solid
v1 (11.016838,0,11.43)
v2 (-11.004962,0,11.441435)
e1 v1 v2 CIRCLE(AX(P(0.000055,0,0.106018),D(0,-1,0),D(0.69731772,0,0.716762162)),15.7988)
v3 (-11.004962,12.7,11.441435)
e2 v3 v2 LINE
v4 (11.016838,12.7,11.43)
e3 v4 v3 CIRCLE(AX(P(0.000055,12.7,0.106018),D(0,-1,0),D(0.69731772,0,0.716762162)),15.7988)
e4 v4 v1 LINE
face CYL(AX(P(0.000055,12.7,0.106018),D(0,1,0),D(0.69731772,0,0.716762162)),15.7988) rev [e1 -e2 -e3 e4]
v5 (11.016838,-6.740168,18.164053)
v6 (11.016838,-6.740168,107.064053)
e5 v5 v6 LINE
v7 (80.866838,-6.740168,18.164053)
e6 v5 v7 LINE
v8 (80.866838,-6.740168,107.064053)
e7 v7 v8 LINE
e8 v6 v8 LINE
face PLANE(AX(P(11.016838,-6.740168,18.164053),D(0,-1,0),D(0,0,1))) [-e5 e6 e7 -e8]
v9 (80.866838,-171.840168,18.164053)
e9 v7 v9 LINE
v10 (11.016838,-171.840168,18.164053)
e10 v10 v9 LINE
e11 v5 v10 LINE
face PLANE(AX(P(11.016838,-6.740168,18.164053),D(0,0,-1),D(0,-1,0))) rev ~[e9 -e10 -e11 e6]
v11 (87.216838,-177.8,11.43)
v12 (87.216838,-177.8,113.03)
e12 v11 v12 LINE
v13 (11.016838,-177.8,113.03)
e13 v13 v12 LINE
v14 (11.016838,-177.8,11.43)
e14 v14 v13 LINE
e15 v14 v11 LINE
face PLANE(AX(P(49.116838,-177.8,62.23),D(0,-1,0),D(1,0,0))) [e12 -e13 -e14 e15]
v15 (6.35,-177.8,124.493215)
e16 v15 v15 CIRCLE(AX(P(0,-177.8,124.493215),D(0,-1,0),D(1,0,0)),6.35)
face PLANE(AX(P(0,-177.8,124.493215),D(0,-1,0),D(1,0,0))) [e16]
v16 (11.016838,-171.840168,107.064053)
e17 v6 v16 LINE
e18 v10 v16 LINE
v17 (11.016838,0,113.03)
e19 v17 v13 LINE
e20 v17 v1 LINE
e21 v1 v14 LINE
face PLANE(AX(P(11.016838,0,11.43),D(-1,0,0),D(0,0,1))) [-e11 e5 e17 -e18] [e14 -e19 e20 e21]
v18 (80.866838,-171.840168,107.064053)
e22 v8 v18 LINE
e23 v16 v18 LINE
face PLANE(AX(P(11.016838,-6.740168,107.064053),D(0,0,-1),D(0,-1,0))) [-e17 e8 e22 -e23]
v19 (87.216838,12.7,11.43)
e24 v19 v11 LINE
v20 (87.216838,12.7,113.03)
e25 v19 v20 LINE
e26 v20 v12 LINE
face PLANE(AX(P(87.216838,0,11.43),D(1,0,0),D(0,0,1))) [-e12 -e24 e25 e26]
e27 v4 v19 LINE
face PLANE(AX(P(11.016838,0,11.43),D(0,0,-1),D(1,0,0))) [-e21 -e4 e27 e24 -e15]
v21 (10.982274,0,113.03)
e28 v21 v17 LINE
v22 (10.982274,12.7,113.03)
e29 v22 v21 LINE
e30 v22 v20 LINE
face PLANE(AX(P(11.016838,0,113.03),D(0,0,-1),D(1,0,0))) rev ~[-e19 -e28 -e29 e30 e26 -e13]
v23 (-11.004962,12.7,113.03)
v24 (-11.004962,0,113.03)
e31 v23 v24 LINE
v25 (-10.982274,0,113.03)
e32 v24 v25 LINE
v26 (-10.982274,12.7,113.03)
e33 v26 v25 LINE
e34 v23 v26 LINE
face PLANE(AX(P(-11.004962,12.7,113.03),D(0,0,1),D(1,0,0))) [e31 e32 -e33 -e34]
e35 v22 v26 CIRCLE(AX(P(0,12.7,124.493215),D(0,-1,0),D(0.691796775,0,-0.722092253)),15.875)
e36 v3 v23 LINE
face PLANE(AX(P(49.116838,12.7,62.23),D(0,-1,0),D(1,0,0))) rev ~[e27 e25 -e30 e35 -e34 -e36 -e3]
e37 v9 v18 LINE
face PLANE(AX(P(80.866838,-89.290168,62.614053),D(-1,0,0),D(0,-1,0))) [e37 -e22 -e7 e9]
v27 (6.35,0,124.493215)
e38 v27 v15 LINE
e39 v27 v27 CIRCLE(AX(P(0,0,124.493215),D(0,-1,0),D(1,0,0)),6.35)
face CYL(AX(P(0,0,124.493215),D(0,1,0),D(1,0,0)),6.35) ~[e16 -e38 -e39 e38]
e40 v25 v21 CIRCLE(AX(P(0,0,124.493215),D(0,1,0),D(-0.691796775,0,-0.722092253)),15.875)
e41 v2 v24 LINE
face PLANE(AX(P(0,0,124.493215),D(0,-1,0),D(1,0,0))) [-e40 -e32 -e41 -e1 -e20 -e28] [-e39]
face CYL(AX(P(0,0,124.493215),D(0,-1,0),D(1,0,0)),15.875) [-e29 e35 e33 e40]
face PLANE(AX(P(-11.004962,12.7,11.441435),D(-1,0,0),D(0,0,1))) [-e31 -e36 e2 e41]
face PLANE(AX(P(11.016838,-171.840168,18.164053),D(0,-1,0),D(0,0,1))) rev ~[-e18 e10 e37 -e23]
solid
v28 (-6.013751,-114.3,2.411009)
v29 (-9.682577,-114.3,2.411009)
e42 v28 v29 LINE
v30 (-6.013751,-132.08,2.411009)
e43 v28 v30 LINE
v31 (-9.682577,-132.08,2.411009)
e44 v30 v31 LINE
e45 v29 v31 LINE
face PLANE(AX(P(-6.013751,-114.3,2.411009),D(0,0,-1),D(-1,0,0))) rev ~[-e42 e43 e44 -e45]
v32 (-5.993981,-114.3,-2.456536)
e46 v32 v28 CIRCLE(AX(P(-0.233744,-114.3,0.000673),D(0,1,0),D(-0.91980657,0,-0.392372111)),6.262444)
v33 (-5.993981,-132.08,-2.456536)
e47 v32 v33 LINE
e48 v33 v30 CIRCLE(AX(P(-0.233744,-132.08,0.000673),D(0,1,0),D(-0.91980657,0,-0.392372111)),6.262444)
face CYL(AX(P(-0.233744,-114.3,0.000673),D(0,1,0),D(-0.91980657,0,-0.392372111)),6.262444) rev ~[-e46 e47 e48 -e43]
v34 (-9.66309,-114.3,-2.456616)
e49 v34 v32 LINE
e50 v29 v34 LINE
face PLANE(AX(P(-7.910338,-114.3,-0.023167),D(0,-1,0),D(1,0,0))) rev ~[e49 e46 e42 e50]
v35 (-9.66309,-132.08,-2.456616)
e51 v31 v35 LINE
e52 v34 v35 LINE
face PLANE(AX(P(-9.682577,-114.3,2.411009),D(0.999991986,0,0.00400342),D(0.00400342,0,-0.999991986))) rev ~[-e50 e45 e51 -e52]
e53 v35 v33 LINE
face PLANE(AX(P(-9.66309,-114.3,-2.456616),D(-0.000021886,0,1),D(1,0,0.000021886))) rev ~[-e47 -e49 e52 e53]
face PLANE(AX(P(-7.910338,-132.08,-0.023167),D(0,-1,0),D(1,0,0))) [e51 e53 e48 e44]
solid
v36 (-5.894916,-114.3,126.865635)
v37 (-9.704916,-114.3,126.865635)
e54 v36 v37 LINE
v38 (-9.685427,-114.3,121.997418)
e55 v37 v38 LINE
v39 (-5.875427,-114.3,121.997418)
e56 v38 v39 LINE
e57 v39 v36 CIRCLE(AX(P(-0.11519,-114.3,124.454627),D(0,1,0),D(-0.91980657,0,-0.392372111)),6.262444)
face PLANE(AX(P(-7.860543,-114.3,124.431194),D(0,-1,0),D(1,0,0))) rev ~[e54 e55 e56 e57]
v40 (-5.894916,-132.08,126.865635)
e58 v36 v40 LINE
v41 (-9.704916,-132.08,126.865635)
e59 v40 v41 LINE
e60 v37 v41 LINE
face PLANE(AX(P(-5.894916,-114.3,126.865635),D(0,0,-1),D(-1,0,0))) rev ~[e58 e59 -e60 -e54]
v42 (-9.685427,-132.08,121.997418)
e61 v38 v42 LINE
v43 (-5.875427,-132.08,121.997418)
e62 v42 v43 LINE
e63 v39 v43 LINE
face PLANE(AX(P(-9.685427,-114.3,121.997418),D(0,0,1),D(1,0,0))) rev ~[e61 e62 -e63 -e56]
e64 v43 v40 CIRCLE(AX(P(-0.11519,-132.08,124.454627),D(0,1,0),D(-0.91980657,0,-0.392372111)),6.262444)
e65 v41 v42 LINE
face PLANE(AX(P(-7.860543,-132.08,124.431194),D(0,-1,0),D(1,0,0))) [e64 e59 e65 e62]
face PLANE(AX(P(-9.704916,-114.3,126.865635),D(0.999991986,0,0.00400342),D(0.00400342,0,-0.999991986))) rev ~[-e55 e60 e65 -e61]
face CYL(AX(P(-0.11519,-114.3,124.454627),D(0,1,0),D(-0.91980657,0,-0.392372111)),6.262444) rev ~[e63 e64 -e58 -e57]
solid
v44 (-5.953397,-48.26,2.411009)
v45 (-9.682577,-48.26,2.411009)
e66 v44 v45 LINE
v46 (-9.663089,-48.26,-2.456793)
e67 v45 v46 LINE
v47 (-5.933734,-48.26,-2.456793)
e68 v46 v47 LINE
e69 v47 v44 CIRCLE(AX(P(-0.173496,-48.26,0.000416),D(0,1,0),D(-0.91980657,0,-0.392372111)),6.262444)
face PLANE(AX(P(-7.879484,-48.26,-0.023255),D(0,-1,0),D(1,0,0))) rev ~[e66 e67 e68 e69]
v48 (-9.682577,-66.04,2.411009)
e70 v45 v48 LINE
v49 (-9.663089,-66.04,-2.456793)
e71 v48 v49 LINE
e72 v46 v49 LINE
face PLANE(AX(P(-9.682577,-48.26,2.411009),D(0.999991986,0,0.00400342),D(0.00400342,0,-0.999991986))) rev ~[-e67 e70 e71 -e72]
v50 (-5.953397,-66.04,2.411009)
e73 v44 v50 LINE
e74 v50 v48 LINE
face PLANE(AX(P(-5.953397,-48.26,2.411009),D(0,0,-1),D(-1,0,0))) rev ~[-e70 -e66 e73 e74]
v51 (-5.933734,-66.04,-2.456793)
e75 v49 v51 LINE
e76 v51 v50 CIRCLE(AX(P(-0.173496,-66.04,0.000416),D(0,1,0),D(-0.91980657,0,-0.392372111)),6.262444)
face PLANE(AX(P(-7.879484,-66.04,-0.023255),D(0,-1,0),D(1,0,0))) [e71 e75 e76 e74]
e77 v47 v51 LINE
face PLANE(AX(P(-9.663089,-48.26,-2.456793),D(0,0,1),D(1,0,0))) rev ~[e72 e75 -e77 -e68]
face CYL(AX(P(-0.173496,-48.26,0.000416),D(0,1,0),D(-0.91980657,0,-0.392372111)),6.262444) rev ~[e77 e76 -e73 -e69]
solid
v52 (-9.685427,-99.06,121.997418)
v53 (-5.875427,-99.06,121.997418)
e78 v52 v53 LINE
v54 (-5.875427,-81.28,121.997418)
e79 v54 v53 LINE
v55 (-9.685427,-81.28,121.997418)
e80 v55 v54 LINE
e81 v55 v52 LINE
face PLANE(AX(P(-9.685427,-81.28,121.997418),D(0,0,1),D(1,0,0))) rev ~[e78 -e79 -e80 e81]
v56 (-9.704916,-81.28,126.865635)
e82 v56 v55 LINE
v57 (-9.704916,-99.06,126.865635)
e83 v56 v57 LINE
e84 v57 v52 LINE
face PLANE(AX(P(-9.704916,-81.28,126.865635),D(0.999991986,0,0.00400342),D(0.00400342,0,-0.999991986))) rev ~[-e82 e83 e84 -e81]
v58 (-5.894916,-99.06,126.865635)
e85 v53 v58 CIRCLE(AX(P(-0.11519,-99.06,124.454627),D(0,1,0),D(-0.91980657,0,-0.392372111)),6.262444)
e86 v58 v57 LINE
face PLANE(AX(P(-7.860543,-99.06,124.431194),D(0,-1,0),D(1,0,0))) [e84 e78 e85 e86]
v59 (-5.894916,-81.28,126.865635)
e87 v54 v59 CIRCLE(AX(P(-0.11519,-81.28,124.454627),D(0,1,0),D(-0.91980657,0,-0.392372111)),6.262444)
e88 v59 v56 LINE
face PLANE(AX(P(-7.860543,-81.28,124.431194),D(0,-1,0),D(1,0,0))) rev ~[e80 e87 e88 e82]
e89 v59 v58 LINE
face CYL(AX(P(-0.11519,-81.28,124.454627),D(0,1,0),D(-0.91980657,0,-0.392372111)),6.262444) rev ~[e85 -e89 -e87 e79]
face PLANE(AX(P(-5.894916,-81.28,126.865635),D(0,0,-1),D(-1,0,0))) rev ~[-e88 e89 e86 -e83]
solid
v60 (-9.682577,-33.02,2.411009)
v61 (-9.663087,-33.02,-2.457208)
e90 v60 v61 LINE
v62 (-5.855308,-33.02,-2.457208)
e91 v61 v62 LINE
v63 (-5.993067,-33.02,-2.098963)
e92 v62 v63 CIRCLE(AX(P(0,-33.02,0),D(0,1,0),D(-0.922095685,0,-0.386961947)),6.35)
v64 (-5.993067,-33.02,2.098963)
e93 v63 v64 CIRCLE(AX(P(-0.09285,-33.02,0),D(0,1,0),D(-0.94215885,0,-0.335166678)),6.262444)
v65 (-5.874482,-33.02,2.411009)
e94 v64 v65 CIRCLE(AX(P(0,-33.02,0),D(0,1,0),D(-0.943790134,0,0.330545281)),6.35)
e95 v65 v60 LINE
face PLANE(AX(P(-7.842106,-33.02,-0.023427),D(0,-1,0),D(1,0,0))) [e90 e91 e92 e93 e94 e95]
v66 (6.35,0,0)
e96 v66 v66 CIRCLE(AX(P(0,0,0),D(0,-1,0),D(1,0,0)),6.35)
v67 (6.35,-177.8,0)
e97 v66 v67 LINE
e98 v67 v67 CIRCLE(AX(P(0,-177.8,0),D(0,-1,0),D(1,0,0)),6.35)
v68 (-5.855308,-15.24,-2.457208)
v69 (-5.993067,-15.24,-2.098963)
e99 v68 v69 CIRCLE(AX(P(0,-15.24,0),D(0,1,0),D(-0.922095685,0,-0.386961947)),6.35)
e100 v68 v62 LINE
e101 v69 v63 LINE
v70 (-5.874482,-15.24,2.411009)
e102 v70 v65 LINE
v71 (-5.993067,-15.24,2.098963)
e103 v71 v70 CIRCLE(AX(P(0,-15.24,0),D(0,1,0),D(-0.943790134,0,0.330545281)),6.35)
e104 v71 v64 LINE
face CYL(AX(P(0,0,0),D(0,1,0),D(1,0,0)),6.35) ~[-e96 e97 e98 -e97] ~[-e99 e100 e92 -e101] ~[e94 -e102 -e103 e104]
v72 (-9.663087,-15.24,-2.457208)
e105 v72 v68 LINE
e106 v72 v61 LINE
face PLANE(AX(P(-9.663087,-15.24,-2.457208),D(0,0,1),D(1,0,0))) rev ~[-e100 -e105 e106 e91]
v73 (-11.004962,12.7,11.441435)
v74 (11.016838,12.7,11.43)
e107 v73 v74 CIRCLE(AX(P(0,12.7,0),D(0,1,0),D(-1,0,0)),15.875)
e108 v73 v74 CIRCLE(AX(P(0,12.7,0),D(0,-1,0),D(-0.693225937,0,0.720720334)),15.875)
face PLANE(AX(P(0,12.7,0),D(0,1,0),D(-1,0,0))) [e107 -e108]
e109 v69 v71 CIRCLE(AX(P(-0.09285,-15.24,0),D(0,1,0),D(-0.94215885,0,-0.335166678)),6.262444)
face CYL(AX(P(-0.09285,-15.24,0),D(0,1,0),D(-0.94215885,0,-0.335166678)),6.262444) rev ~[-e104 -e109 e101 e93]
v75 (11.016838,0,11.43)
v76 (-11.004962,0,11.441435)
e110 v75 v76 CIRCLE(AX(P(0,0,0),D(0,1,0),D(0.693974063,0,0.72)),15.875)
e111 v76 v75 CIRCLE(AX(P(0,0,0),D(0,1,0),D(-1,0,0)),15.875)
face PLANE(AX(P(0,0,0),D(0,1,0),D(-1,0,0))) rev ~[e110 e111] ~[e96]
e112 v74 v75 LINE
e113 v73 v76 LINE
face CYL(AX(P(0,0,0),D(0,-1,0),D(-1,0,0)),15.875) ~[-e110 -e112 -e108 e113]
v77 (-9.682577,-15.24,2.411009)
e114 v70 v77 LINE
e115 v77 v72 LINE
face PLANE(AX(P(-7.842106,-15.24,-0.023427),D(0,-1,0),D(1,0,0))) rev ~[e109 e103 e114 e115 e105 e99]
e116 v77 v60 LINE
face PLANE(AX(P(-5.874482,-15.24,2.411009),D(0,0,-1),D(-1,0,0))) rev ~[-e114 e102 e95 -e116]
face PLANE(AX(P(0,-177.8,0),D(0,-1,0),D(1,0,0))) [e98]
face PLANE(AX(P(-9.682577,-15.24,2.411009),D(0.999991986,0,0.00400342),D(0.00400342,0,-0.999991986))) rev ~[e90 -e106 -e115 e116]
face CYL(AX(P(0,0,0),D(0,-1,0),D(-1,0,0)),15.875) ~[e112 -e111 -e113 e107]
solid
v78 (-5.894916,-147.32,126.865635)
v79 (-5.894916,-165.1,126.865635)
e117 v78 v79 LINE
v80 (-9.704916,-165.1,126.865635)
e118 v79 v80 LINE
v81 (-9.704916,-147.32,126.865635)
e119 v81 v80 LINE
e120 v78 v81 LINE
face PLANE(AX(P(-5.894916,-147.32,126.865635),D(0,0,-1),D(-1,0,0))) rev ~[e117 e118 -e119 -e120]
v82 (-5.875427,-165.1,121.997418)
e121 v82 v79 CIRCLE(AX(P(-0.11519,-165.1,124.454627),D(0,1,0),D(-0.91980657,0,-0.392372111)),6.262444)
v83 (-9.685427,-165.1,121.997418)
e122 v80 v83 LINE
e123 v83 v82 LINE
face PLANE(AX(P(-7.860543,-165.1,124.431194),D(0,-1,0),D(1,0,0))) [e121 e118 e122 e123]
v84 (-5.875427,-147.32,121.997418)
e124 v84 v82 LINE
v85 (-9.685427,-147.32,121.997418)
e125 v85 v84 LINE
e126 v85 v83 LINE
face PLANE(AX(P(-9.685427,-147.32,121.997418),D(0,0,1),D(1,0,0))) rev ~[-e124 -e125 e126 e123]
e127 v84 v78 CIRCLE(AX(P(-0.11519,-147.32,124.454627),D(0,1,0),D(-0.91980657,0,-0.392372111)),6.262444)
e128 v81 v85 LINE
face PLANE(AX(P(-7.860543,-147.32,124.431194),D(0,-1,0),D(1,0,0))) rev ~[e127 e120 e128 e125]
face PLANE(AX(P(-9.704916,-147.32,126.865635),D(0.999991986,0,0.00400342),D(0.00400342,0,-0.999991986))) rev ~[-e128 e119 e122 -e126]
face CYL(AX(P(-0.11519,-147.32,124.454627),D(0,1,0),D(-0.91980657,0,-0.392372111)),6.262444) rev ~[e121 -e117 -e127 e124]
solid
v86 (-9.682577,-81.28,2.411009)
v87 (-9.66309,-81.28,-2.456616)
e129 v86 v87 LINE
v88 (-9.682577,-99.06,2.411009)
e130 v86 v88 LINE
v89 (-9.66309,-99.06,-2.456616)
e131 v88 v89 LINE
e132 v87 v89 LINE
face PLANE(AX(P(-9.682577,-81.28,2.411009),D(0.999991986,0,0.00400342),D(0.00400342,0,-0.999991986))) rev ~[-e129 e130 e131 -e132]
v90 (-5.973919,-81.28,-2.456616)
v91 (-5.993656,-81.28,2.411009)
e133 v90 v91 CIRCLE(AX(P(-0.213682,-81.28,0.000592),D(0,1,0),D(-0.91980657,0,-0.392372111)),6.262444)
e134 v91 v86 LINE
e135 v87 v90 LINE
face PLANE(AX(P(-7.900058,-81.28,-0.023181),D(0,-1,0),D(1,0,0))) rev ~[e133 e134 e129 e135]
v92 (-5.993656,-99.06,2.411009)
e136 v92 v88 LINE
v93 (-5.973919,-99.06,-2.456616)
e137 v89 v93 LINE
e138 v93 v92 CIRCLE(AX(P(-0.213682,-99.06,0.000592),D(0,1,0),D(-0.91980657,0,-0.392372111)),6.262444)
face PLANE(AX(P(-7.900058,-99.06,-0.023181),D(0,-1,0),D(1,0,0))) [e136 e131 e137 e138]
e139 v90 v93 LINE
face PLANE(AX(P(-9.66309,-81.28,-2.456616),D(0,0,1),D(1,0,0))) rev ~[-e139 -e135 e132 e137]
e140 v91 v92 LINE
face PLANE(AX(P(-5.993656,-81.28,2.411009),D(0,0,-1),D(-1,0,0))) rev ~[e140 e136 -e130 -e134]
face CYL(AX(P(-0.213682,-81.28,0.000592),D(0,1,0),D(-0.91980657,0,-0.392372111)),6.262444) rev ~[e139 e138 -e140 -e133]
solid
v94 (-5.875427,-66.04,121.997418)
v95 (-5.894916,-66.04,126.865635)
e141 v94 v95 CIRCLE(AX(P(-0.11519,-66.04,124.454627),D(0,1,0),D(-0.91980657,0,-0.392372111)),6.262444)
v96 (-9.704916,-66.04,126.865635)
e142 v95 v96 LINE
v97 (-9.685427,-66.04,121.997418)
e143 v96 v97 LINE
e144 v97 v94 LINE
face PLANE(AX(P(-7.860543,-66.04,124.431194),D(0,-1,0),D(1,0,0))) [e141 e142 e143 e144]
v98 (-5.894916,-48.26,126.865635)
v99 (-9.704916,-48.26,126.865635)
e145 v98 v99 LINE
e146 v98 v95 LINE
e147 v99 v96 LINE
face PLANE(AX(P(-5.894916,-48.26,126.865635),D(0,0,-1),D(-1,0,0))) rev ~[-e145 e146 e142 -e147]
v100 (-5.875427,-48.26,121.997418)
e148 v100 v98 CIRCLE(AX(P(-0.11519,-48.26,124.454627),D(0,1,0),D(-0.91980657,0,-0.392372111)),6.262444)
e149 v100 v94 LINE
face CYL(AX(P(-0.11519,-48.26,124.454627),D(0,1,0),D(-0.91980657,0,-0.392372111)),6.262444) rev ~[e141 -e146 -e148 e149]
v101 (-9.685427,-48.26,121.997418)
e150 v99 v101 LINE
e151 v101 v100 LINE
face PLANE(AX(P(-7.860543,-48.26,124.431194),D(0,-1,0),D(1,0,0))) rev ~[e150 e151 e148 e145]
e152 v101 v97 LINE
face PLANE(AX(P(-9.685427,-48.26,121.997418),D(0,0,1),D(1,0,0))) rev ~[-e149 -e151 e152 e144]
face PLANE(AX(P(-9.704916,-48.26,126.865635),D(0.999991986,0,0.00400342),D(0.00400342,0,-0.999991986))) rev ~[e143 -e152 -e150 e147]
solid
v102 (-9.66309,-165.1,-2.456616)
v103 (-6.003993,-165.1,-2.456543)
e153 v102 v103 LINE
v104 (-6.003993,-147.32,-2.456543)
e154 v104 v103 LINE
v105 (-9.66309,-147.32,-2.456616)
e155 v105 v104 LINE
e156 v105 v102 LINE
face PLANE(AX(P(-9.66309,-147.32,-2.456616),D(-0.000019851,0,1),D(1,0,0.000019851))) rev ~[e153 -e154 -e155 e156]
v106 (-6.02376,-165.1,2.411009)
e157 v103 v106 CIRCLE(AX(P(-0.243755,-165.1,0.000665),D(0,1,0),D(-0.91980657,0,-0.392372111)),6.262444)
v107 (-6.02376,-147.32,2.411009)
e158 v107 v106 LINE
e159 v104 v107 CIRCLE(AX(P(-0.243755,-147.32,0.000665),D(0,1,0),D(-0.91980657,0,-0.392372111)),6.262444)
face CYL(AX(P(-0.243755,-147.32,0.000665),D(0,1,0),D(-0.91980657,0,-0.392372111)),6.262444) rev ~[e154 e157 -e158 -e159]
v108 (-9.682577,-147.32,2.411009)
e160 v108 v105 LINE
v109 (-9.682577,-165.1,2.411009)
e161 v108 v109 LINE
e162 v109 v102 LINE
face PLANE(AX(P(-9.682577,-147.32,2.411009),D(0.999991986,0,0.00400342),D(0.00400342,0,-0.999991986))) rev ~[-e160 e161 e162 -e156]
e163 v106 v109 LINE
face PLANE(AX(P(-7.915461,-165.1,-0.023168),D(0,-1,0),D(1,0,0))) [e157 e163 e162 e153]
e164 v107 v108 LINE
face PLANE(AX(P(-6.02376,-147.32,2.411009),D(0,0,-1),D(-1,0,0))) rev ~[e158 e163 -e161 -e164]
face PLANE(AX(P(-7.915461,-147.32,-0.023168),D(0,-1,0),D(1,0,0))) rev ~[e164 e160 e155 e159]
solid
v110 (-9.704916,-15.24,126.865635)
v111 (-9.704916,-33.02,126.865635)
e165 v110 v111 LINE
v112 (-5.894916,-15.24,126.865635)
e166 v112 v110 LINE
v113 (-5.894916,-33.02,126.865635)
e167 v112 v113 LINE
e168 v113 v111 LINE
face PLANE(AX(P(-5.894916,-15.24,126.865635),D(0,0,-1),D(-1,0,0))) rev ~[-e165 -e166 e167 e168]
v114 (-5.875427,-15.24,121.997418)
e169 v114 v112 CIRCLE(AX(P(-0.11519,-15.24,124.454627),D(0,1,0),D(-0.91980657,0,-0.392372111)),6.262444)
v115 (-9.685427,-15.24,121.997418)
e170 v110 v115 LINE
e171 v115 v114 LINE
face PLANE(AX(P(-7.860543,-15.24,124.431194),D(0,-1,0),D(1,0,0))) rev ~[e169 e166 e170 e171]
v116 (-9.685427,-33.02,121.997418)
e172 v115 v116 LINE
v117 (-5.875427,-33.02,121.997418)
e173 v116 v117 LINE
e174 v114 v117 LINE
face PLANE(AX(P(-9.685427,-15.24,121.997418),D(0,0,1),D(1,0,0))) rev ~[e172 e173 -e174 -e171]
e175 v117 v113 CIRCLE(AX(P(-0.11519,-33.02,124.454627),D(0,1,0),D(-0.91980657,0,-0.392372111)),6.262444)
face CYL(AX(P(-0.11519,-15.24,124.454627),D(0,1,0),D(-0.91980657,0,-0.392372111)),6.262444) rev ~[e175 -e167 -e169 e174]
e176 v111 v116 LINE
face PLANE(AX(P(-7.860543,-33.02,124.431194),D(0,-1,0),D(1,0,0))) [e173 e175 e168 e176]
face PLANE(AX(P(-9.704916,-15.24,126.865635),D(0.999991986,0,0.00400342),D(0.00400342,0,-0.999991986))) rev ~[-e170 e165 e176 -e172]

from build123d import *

# Parameters (mm, degrees)
F0_R           = 6.35
F1_DEPTH       = 177.8
F2_R           = 15.875
F2_R_2         = 6.35
F3_DEPTH       = 12.7
F6_DEPTH       = 12.7
F5_R           = 15.875
F7_DEPTH       = 12.7
F8_R           = 6.35
F9_DEPTH       = 177.8
F10_W          = 76.2
F10_H          = 101.6
F11_DEPTH      = 177.8
F11_DEPTH_BACK = 12.7
F12_W          = 165.1
F12_H          = 88.9
F13_DEPTH      = 69.85
F15_START      = 15.24
F15_DEPTH      = 17.78
F17_START      = 15.24
F17_DEPTH      = 17.78
F19_START      = 15.24
F19_DEPTH      = 17.78
F21_START      = 15.24
F21_DEPTH      = 17.78
F23_START      = 15.24
F23_DEPTH      = 17.78
F25_START      = 15.24
F25_DEPTH      = 17.78
F26_START      = 15.24
F26_DEPTH      = 17.78
F27_START      = 15.24
F27_DEPTH      = 17.78
F28_START      = 15.24
F28_DEPTH      = 17.78
F29_START      = 15.24
F29_DEPTH      = 17.78


# Not quite as in the source:
# - ends of sketch curves that miss each other by under 0.0002 mm in the source are joined


with BuildPart() as f1:
    # F0 (on Front) → F1 (new body)
    with BuildSketch(Plane.XZ):
        Circle(F0_R)
    extrude(amount=F1_DEPTH)

    # F2 (on face) → F3 (join)
    with BuildSketch(Plane(origin=(0, 0, 0), x_dir=(-1, 0, 0), z_dir=(0, 1, 0))):
        Circle(F2_R)
        Circle(F2_R_2, mode=Mode.SUBTRACT)
        Circle(F2_R_2)
    extrude(amount=F3_DEPTH)



with BuildPart() as f6:
    # F4 (on face) → F6 (new body)
    with BuildSketch(Plane(origin=(0, 12.7, 0), x_dir=(-1, 0, 0), z_dir=(0, 1, 0))):
        with BuildLine():
            ThreePointArc((-11.0168382488, 11.43), (-0.0082589267, 15.9048158213), (11.0049617512, 11.4414353057))
            Line((11.0049617512, 11.4414353057), (11.0049617512, 113.03))
            Line((11.0049617512, 113.03), (-11.0168382488, 113.03))
            Line((-11.0168382488, 113.03), (-11.0168382488, 11.43))
        make_face()
    extrude(amount=-F6_DEPTH)

    # F5 (on Front) → F7 (join)
    with BuildSketch(Plane.XZ):
        with Locations((0, 124.4932145201)):
            Circle(F5_R)
    extrude(amount=-F7_DEPTH)

    # F8 (on face) → F9 (join)
    with BuildSketch(Plane.XZ):
        with Locations((0, 124.4932145201)):
            Circle(F8_R)
    extrude(amount=F9_DEPTH)


with BuildPart() as f1_1:
    add(f1.part)

    add(f6.part)  # F11 merges F6
    # F10 (on face) → F11 (join, two sides)
    with BuildSketch(Plane.XZ) as f11_sk:
        with Locations((49.1168382488, 62.23)):
            Rectangle(F10_W, F10_H)
    extrude(amount=F11_DEPTH)
    extrude(f11_sk.sketch, amount=-F11_DEPTH_BACK)

    # F12 (on face) → F13 (cut)
    with BuildSketch(Plane(origin=(11.0168382488, 0, 0), x_dir=(0, -1, 0), z_dir=(-1, 0, 0))):
        with Locations((89.290167737, 62.6140534163)):
            Rectangle(F12_W, F12_H)
    extrude(amount=-F13_DEPTH, mode=Mode.SUBTRACT)

    # F14 (on face) → F15 (join)
    with BuildSketch(Plane.XZ.offset(F15_START)):
        with BuildLine():
            ThreePointArc((-5.9930673501, -2.0989625382), (-6.3552943125, 0), (-5.9930673501, 2.0989625382))
            ThreePointArc((-5.9930673501, 2.0989625382), (-5.9358254943, 2.2557649925), (-5.8744818664, 2.4110086688))
            Line((-5.8744818664, 2.4110086688), (-9.6825771242, 2.4110086688))
            Line((-9.6825771242, 2.4110086688), (-9.6630874508, -2.4572083608))
            Line((-9.6630874508, -2.4572083608), (-5.8553075984, -2.4572083608))
            ThreePointArc((-5.8553075984, -2.4572083608), (-5.9268948234, -2.2791265328), (-5.9930673501, -2.0989625382))
        make_face()
    extrude(amount=F15_DEPTH)


with BuildPart() as f17:
    # F16 (on face) → F17 (new body)
    with BuildSketch(Plane.XZ.offset(33.02).offset(F17_START)):
        with BuildLine():
            ThreePointArc((-5.9337336, -2.4567926286), (-6.4358893705, -0.0248806826), (-5.9533966783, 2.4110086688))
            Line((-5.9533966783, 2.4110086688), (-9.6825771242, 2.4110086688))
            Line((-9.6825771242, 2.4110086688), (-9.6630891152, -2.4567926286))
            Line((-9.6630891152, -2.4567926286), (-5.9337336, -2.4567926286))
        make_face()
    extrude(amount=F17_DEPTH)


with BuildPart() as f19:
    # F18 (on face) → F19 (new body)
    with BuildSketch(Plane.XZ.offset(66.04).offset(F19_START)):
        with BuildLine():
            ThreePointArc((-5.9739191651, -2.4566159906), (-6.4760745484, -0.0247997357), (-5.9936559097, 2.4110086688))
            Line((-5.9936559097, 2.4110086688), (-9.6825771242, 2.4110086688))
            Line((-9.6825771242, 2.4110086688), (-9.6630898224, -2.4566159906))
            Line((-9.6630898224, -2.4566159906), (-5.9739191651, -2.4566159906))
        make_face()
    extrude(amount=F19_DEPTH)


with BuildPart() as f21:
    # F20 (on face) → F21 (new body)
    with BuildSketch(Plane.XZ.offset(99.06).offset(F21_START)):
        with BuildLine():
            ThreePointArc((-5.9939809047, -2.4565356888), (-6.4961361114, -0.0247629358), (-6.0137511368, 2.4110086688))
            Line((-6.0137511368, 2.4110086688), (-9.6825771242, 2.4110086688))
            Line((-9.6825771242, 2.4110086688), (-9.6630898224, -2.4566159906))
            Line((-9.6630898224, -2.4566159906), (-5.9939809047, -2.4565356888))
        make_face()
    extrude(amount=F21_DEPTH)


with BuildPart() as f23:
    # F22 (on face) → F23 (new body)
    with BuildSketch(Plane.XZ.offset(132.08).offset(F23_START)):
        with BuildLine():
            ThreePointArc((-6.0039925358, -2.4565433546), (-6.5061477593, -0.0247664488), (-6.0237595711, 2.4110086688))
            Line((-6.0237595711, 2.4110086688), (-9.6825771242, 2.4110086688))
            Line((-9.6825771242, 2.4110086688), (-9.6630898224, -2.4566159906))
            Line((-9.6630898224, -2.4566159906), (-6.0039925358, -2.4565433546))
        make_face()
    extrude(amount=F23_DEPTH)


with BuildPart() as f25:
    # F24 (on face) → F25 (new body)
    with BuildSketch(Plane.XZ.offset(F25_START)):
        with BuildLine():
            ThreePointArc((-5.875426674, 121.9974181886), (-6.3775833502, 124.4295553562), (-5.8949163474, 126.8656352182))
            Line((-5.8949163474, 126.8656352182), (-9.7049163474, 126.8656352182))
            Line((-9.7049163474, 126.8656352182), (-9.685426674, 121.9974181886))
            Line((-9.685426674, 121.9974181886), (-5.875426674, 121.9974181886))
        make_face()
    extrude(amount=F25_DEPTH)


with BuildPart() as f26:
    # F25_face (on face) → F26 (new body)
    with BuildSketch(Plane(origin=(-7.9525870478, -33.02, 124.4316019733), x_dir=(1, 0, 0), z_dir=(0, -1, 0)).offset(F26_START)):
        with BuildLine():
            ThreePointArc((2.0771603738, -2.4341837848), (1.5750036976, -0.0020466171), (2.0576707004, 2.4340332449))
            Line((2.0576707004, 2.4340332449), (-1.7523292996, 2.4340332449))
            Line((-1.7523292996, 2.4340332449), (-1.7328396262, -2.4341837848))
            Line((-1.7328396262, -2.4341837848), (2.0771603738, -2.4341837848))
        make_face()
    extrude(amount=F26_DEPTH)


with BuildPart() as f27:
    # F26_face (on face) → F27 (new body)
    with BuildSketch(Plane(origin=(-7.9525870478, -66.04, 124.4316019733), x_dir=(1, 0, 0), z_dir=(0, -1, 0)).offset(F27_START)):
        with BuildLine():
            Line((-1.7328396262, -2.4341837848), (2.0771603738, -2.4341837848))
            ThreePointArc((2.0771603738, -2.4341837848), (1.5750036976, -0.0020466171), (2.0576707004, 2.4340332449))
            Line((2.0576707004, 2.4340332449), (-1.7523292996, 2.4340332449))
            Line((-1.7523292996, 2.4340332449), (-1.7328396262, -2.4341837848))
        make_face()
    extrude(amount=F27_DEPTH)


with BuildPart() as f28:
    # F27_face (on face) → F28 (new body)
    with BuildSketch(Plane(origin=(-7.9525870478, -99.06, 124.4316019733), x_dir=(1, 0, 0), z_dir=(0, -1, 0)).offset(F28_START)):
        with BuildLine():
            Line((2.0576707004, 2.4340332449), (-1.7523292996, 2.4340332449))
            Line((-1.7523292996, 2.4340332449), (-1.7328396262, -2.4341837848))
            Line((-1.7328396262, -2.4341837848), (2.0771603738, -2.4341837848))
            ThreePointArc((2.0771603738, -2.4341837848), (1.5750036976, -0.0020466171), (2.0576707004, 2.4340332449))
        make_face()
    extrude(amount=F28_DEPTH)


with BuildPart() as f29:
    # F28_face (on face) → F29 (new body)
    with BuildSketch(Plane(origin=(-7.9525870478, -132.08, 124.4316019733), x_dir=(1, 0, 0), z_dir=(0, -1, 0)).offset(F29_START)):
        with BuildLine():
            Line((2.0576707004, 2.4340332449), (-1.7523292996, 2.4340332449))
            Line((-1.7523292996, 2.4340332449), (-1.7328396262, -2.4341837848))
            Line((-1.7328396262, -2.4341837848), (2.0771603738, -2.4341837848))
            ThreePointArc((2.0771603738, -2.4341837848), (1.5750036976, -0.0020466171), (2.0576707004, 2.4340332449))
        make_face()
    extrude(amount=F29_DEPTH)


solid = Compound([f1_1.part, f17.part, f19.part, f21.part, f23.part, f25.part, f26.part, f27.part, f28.part, f29.part])
